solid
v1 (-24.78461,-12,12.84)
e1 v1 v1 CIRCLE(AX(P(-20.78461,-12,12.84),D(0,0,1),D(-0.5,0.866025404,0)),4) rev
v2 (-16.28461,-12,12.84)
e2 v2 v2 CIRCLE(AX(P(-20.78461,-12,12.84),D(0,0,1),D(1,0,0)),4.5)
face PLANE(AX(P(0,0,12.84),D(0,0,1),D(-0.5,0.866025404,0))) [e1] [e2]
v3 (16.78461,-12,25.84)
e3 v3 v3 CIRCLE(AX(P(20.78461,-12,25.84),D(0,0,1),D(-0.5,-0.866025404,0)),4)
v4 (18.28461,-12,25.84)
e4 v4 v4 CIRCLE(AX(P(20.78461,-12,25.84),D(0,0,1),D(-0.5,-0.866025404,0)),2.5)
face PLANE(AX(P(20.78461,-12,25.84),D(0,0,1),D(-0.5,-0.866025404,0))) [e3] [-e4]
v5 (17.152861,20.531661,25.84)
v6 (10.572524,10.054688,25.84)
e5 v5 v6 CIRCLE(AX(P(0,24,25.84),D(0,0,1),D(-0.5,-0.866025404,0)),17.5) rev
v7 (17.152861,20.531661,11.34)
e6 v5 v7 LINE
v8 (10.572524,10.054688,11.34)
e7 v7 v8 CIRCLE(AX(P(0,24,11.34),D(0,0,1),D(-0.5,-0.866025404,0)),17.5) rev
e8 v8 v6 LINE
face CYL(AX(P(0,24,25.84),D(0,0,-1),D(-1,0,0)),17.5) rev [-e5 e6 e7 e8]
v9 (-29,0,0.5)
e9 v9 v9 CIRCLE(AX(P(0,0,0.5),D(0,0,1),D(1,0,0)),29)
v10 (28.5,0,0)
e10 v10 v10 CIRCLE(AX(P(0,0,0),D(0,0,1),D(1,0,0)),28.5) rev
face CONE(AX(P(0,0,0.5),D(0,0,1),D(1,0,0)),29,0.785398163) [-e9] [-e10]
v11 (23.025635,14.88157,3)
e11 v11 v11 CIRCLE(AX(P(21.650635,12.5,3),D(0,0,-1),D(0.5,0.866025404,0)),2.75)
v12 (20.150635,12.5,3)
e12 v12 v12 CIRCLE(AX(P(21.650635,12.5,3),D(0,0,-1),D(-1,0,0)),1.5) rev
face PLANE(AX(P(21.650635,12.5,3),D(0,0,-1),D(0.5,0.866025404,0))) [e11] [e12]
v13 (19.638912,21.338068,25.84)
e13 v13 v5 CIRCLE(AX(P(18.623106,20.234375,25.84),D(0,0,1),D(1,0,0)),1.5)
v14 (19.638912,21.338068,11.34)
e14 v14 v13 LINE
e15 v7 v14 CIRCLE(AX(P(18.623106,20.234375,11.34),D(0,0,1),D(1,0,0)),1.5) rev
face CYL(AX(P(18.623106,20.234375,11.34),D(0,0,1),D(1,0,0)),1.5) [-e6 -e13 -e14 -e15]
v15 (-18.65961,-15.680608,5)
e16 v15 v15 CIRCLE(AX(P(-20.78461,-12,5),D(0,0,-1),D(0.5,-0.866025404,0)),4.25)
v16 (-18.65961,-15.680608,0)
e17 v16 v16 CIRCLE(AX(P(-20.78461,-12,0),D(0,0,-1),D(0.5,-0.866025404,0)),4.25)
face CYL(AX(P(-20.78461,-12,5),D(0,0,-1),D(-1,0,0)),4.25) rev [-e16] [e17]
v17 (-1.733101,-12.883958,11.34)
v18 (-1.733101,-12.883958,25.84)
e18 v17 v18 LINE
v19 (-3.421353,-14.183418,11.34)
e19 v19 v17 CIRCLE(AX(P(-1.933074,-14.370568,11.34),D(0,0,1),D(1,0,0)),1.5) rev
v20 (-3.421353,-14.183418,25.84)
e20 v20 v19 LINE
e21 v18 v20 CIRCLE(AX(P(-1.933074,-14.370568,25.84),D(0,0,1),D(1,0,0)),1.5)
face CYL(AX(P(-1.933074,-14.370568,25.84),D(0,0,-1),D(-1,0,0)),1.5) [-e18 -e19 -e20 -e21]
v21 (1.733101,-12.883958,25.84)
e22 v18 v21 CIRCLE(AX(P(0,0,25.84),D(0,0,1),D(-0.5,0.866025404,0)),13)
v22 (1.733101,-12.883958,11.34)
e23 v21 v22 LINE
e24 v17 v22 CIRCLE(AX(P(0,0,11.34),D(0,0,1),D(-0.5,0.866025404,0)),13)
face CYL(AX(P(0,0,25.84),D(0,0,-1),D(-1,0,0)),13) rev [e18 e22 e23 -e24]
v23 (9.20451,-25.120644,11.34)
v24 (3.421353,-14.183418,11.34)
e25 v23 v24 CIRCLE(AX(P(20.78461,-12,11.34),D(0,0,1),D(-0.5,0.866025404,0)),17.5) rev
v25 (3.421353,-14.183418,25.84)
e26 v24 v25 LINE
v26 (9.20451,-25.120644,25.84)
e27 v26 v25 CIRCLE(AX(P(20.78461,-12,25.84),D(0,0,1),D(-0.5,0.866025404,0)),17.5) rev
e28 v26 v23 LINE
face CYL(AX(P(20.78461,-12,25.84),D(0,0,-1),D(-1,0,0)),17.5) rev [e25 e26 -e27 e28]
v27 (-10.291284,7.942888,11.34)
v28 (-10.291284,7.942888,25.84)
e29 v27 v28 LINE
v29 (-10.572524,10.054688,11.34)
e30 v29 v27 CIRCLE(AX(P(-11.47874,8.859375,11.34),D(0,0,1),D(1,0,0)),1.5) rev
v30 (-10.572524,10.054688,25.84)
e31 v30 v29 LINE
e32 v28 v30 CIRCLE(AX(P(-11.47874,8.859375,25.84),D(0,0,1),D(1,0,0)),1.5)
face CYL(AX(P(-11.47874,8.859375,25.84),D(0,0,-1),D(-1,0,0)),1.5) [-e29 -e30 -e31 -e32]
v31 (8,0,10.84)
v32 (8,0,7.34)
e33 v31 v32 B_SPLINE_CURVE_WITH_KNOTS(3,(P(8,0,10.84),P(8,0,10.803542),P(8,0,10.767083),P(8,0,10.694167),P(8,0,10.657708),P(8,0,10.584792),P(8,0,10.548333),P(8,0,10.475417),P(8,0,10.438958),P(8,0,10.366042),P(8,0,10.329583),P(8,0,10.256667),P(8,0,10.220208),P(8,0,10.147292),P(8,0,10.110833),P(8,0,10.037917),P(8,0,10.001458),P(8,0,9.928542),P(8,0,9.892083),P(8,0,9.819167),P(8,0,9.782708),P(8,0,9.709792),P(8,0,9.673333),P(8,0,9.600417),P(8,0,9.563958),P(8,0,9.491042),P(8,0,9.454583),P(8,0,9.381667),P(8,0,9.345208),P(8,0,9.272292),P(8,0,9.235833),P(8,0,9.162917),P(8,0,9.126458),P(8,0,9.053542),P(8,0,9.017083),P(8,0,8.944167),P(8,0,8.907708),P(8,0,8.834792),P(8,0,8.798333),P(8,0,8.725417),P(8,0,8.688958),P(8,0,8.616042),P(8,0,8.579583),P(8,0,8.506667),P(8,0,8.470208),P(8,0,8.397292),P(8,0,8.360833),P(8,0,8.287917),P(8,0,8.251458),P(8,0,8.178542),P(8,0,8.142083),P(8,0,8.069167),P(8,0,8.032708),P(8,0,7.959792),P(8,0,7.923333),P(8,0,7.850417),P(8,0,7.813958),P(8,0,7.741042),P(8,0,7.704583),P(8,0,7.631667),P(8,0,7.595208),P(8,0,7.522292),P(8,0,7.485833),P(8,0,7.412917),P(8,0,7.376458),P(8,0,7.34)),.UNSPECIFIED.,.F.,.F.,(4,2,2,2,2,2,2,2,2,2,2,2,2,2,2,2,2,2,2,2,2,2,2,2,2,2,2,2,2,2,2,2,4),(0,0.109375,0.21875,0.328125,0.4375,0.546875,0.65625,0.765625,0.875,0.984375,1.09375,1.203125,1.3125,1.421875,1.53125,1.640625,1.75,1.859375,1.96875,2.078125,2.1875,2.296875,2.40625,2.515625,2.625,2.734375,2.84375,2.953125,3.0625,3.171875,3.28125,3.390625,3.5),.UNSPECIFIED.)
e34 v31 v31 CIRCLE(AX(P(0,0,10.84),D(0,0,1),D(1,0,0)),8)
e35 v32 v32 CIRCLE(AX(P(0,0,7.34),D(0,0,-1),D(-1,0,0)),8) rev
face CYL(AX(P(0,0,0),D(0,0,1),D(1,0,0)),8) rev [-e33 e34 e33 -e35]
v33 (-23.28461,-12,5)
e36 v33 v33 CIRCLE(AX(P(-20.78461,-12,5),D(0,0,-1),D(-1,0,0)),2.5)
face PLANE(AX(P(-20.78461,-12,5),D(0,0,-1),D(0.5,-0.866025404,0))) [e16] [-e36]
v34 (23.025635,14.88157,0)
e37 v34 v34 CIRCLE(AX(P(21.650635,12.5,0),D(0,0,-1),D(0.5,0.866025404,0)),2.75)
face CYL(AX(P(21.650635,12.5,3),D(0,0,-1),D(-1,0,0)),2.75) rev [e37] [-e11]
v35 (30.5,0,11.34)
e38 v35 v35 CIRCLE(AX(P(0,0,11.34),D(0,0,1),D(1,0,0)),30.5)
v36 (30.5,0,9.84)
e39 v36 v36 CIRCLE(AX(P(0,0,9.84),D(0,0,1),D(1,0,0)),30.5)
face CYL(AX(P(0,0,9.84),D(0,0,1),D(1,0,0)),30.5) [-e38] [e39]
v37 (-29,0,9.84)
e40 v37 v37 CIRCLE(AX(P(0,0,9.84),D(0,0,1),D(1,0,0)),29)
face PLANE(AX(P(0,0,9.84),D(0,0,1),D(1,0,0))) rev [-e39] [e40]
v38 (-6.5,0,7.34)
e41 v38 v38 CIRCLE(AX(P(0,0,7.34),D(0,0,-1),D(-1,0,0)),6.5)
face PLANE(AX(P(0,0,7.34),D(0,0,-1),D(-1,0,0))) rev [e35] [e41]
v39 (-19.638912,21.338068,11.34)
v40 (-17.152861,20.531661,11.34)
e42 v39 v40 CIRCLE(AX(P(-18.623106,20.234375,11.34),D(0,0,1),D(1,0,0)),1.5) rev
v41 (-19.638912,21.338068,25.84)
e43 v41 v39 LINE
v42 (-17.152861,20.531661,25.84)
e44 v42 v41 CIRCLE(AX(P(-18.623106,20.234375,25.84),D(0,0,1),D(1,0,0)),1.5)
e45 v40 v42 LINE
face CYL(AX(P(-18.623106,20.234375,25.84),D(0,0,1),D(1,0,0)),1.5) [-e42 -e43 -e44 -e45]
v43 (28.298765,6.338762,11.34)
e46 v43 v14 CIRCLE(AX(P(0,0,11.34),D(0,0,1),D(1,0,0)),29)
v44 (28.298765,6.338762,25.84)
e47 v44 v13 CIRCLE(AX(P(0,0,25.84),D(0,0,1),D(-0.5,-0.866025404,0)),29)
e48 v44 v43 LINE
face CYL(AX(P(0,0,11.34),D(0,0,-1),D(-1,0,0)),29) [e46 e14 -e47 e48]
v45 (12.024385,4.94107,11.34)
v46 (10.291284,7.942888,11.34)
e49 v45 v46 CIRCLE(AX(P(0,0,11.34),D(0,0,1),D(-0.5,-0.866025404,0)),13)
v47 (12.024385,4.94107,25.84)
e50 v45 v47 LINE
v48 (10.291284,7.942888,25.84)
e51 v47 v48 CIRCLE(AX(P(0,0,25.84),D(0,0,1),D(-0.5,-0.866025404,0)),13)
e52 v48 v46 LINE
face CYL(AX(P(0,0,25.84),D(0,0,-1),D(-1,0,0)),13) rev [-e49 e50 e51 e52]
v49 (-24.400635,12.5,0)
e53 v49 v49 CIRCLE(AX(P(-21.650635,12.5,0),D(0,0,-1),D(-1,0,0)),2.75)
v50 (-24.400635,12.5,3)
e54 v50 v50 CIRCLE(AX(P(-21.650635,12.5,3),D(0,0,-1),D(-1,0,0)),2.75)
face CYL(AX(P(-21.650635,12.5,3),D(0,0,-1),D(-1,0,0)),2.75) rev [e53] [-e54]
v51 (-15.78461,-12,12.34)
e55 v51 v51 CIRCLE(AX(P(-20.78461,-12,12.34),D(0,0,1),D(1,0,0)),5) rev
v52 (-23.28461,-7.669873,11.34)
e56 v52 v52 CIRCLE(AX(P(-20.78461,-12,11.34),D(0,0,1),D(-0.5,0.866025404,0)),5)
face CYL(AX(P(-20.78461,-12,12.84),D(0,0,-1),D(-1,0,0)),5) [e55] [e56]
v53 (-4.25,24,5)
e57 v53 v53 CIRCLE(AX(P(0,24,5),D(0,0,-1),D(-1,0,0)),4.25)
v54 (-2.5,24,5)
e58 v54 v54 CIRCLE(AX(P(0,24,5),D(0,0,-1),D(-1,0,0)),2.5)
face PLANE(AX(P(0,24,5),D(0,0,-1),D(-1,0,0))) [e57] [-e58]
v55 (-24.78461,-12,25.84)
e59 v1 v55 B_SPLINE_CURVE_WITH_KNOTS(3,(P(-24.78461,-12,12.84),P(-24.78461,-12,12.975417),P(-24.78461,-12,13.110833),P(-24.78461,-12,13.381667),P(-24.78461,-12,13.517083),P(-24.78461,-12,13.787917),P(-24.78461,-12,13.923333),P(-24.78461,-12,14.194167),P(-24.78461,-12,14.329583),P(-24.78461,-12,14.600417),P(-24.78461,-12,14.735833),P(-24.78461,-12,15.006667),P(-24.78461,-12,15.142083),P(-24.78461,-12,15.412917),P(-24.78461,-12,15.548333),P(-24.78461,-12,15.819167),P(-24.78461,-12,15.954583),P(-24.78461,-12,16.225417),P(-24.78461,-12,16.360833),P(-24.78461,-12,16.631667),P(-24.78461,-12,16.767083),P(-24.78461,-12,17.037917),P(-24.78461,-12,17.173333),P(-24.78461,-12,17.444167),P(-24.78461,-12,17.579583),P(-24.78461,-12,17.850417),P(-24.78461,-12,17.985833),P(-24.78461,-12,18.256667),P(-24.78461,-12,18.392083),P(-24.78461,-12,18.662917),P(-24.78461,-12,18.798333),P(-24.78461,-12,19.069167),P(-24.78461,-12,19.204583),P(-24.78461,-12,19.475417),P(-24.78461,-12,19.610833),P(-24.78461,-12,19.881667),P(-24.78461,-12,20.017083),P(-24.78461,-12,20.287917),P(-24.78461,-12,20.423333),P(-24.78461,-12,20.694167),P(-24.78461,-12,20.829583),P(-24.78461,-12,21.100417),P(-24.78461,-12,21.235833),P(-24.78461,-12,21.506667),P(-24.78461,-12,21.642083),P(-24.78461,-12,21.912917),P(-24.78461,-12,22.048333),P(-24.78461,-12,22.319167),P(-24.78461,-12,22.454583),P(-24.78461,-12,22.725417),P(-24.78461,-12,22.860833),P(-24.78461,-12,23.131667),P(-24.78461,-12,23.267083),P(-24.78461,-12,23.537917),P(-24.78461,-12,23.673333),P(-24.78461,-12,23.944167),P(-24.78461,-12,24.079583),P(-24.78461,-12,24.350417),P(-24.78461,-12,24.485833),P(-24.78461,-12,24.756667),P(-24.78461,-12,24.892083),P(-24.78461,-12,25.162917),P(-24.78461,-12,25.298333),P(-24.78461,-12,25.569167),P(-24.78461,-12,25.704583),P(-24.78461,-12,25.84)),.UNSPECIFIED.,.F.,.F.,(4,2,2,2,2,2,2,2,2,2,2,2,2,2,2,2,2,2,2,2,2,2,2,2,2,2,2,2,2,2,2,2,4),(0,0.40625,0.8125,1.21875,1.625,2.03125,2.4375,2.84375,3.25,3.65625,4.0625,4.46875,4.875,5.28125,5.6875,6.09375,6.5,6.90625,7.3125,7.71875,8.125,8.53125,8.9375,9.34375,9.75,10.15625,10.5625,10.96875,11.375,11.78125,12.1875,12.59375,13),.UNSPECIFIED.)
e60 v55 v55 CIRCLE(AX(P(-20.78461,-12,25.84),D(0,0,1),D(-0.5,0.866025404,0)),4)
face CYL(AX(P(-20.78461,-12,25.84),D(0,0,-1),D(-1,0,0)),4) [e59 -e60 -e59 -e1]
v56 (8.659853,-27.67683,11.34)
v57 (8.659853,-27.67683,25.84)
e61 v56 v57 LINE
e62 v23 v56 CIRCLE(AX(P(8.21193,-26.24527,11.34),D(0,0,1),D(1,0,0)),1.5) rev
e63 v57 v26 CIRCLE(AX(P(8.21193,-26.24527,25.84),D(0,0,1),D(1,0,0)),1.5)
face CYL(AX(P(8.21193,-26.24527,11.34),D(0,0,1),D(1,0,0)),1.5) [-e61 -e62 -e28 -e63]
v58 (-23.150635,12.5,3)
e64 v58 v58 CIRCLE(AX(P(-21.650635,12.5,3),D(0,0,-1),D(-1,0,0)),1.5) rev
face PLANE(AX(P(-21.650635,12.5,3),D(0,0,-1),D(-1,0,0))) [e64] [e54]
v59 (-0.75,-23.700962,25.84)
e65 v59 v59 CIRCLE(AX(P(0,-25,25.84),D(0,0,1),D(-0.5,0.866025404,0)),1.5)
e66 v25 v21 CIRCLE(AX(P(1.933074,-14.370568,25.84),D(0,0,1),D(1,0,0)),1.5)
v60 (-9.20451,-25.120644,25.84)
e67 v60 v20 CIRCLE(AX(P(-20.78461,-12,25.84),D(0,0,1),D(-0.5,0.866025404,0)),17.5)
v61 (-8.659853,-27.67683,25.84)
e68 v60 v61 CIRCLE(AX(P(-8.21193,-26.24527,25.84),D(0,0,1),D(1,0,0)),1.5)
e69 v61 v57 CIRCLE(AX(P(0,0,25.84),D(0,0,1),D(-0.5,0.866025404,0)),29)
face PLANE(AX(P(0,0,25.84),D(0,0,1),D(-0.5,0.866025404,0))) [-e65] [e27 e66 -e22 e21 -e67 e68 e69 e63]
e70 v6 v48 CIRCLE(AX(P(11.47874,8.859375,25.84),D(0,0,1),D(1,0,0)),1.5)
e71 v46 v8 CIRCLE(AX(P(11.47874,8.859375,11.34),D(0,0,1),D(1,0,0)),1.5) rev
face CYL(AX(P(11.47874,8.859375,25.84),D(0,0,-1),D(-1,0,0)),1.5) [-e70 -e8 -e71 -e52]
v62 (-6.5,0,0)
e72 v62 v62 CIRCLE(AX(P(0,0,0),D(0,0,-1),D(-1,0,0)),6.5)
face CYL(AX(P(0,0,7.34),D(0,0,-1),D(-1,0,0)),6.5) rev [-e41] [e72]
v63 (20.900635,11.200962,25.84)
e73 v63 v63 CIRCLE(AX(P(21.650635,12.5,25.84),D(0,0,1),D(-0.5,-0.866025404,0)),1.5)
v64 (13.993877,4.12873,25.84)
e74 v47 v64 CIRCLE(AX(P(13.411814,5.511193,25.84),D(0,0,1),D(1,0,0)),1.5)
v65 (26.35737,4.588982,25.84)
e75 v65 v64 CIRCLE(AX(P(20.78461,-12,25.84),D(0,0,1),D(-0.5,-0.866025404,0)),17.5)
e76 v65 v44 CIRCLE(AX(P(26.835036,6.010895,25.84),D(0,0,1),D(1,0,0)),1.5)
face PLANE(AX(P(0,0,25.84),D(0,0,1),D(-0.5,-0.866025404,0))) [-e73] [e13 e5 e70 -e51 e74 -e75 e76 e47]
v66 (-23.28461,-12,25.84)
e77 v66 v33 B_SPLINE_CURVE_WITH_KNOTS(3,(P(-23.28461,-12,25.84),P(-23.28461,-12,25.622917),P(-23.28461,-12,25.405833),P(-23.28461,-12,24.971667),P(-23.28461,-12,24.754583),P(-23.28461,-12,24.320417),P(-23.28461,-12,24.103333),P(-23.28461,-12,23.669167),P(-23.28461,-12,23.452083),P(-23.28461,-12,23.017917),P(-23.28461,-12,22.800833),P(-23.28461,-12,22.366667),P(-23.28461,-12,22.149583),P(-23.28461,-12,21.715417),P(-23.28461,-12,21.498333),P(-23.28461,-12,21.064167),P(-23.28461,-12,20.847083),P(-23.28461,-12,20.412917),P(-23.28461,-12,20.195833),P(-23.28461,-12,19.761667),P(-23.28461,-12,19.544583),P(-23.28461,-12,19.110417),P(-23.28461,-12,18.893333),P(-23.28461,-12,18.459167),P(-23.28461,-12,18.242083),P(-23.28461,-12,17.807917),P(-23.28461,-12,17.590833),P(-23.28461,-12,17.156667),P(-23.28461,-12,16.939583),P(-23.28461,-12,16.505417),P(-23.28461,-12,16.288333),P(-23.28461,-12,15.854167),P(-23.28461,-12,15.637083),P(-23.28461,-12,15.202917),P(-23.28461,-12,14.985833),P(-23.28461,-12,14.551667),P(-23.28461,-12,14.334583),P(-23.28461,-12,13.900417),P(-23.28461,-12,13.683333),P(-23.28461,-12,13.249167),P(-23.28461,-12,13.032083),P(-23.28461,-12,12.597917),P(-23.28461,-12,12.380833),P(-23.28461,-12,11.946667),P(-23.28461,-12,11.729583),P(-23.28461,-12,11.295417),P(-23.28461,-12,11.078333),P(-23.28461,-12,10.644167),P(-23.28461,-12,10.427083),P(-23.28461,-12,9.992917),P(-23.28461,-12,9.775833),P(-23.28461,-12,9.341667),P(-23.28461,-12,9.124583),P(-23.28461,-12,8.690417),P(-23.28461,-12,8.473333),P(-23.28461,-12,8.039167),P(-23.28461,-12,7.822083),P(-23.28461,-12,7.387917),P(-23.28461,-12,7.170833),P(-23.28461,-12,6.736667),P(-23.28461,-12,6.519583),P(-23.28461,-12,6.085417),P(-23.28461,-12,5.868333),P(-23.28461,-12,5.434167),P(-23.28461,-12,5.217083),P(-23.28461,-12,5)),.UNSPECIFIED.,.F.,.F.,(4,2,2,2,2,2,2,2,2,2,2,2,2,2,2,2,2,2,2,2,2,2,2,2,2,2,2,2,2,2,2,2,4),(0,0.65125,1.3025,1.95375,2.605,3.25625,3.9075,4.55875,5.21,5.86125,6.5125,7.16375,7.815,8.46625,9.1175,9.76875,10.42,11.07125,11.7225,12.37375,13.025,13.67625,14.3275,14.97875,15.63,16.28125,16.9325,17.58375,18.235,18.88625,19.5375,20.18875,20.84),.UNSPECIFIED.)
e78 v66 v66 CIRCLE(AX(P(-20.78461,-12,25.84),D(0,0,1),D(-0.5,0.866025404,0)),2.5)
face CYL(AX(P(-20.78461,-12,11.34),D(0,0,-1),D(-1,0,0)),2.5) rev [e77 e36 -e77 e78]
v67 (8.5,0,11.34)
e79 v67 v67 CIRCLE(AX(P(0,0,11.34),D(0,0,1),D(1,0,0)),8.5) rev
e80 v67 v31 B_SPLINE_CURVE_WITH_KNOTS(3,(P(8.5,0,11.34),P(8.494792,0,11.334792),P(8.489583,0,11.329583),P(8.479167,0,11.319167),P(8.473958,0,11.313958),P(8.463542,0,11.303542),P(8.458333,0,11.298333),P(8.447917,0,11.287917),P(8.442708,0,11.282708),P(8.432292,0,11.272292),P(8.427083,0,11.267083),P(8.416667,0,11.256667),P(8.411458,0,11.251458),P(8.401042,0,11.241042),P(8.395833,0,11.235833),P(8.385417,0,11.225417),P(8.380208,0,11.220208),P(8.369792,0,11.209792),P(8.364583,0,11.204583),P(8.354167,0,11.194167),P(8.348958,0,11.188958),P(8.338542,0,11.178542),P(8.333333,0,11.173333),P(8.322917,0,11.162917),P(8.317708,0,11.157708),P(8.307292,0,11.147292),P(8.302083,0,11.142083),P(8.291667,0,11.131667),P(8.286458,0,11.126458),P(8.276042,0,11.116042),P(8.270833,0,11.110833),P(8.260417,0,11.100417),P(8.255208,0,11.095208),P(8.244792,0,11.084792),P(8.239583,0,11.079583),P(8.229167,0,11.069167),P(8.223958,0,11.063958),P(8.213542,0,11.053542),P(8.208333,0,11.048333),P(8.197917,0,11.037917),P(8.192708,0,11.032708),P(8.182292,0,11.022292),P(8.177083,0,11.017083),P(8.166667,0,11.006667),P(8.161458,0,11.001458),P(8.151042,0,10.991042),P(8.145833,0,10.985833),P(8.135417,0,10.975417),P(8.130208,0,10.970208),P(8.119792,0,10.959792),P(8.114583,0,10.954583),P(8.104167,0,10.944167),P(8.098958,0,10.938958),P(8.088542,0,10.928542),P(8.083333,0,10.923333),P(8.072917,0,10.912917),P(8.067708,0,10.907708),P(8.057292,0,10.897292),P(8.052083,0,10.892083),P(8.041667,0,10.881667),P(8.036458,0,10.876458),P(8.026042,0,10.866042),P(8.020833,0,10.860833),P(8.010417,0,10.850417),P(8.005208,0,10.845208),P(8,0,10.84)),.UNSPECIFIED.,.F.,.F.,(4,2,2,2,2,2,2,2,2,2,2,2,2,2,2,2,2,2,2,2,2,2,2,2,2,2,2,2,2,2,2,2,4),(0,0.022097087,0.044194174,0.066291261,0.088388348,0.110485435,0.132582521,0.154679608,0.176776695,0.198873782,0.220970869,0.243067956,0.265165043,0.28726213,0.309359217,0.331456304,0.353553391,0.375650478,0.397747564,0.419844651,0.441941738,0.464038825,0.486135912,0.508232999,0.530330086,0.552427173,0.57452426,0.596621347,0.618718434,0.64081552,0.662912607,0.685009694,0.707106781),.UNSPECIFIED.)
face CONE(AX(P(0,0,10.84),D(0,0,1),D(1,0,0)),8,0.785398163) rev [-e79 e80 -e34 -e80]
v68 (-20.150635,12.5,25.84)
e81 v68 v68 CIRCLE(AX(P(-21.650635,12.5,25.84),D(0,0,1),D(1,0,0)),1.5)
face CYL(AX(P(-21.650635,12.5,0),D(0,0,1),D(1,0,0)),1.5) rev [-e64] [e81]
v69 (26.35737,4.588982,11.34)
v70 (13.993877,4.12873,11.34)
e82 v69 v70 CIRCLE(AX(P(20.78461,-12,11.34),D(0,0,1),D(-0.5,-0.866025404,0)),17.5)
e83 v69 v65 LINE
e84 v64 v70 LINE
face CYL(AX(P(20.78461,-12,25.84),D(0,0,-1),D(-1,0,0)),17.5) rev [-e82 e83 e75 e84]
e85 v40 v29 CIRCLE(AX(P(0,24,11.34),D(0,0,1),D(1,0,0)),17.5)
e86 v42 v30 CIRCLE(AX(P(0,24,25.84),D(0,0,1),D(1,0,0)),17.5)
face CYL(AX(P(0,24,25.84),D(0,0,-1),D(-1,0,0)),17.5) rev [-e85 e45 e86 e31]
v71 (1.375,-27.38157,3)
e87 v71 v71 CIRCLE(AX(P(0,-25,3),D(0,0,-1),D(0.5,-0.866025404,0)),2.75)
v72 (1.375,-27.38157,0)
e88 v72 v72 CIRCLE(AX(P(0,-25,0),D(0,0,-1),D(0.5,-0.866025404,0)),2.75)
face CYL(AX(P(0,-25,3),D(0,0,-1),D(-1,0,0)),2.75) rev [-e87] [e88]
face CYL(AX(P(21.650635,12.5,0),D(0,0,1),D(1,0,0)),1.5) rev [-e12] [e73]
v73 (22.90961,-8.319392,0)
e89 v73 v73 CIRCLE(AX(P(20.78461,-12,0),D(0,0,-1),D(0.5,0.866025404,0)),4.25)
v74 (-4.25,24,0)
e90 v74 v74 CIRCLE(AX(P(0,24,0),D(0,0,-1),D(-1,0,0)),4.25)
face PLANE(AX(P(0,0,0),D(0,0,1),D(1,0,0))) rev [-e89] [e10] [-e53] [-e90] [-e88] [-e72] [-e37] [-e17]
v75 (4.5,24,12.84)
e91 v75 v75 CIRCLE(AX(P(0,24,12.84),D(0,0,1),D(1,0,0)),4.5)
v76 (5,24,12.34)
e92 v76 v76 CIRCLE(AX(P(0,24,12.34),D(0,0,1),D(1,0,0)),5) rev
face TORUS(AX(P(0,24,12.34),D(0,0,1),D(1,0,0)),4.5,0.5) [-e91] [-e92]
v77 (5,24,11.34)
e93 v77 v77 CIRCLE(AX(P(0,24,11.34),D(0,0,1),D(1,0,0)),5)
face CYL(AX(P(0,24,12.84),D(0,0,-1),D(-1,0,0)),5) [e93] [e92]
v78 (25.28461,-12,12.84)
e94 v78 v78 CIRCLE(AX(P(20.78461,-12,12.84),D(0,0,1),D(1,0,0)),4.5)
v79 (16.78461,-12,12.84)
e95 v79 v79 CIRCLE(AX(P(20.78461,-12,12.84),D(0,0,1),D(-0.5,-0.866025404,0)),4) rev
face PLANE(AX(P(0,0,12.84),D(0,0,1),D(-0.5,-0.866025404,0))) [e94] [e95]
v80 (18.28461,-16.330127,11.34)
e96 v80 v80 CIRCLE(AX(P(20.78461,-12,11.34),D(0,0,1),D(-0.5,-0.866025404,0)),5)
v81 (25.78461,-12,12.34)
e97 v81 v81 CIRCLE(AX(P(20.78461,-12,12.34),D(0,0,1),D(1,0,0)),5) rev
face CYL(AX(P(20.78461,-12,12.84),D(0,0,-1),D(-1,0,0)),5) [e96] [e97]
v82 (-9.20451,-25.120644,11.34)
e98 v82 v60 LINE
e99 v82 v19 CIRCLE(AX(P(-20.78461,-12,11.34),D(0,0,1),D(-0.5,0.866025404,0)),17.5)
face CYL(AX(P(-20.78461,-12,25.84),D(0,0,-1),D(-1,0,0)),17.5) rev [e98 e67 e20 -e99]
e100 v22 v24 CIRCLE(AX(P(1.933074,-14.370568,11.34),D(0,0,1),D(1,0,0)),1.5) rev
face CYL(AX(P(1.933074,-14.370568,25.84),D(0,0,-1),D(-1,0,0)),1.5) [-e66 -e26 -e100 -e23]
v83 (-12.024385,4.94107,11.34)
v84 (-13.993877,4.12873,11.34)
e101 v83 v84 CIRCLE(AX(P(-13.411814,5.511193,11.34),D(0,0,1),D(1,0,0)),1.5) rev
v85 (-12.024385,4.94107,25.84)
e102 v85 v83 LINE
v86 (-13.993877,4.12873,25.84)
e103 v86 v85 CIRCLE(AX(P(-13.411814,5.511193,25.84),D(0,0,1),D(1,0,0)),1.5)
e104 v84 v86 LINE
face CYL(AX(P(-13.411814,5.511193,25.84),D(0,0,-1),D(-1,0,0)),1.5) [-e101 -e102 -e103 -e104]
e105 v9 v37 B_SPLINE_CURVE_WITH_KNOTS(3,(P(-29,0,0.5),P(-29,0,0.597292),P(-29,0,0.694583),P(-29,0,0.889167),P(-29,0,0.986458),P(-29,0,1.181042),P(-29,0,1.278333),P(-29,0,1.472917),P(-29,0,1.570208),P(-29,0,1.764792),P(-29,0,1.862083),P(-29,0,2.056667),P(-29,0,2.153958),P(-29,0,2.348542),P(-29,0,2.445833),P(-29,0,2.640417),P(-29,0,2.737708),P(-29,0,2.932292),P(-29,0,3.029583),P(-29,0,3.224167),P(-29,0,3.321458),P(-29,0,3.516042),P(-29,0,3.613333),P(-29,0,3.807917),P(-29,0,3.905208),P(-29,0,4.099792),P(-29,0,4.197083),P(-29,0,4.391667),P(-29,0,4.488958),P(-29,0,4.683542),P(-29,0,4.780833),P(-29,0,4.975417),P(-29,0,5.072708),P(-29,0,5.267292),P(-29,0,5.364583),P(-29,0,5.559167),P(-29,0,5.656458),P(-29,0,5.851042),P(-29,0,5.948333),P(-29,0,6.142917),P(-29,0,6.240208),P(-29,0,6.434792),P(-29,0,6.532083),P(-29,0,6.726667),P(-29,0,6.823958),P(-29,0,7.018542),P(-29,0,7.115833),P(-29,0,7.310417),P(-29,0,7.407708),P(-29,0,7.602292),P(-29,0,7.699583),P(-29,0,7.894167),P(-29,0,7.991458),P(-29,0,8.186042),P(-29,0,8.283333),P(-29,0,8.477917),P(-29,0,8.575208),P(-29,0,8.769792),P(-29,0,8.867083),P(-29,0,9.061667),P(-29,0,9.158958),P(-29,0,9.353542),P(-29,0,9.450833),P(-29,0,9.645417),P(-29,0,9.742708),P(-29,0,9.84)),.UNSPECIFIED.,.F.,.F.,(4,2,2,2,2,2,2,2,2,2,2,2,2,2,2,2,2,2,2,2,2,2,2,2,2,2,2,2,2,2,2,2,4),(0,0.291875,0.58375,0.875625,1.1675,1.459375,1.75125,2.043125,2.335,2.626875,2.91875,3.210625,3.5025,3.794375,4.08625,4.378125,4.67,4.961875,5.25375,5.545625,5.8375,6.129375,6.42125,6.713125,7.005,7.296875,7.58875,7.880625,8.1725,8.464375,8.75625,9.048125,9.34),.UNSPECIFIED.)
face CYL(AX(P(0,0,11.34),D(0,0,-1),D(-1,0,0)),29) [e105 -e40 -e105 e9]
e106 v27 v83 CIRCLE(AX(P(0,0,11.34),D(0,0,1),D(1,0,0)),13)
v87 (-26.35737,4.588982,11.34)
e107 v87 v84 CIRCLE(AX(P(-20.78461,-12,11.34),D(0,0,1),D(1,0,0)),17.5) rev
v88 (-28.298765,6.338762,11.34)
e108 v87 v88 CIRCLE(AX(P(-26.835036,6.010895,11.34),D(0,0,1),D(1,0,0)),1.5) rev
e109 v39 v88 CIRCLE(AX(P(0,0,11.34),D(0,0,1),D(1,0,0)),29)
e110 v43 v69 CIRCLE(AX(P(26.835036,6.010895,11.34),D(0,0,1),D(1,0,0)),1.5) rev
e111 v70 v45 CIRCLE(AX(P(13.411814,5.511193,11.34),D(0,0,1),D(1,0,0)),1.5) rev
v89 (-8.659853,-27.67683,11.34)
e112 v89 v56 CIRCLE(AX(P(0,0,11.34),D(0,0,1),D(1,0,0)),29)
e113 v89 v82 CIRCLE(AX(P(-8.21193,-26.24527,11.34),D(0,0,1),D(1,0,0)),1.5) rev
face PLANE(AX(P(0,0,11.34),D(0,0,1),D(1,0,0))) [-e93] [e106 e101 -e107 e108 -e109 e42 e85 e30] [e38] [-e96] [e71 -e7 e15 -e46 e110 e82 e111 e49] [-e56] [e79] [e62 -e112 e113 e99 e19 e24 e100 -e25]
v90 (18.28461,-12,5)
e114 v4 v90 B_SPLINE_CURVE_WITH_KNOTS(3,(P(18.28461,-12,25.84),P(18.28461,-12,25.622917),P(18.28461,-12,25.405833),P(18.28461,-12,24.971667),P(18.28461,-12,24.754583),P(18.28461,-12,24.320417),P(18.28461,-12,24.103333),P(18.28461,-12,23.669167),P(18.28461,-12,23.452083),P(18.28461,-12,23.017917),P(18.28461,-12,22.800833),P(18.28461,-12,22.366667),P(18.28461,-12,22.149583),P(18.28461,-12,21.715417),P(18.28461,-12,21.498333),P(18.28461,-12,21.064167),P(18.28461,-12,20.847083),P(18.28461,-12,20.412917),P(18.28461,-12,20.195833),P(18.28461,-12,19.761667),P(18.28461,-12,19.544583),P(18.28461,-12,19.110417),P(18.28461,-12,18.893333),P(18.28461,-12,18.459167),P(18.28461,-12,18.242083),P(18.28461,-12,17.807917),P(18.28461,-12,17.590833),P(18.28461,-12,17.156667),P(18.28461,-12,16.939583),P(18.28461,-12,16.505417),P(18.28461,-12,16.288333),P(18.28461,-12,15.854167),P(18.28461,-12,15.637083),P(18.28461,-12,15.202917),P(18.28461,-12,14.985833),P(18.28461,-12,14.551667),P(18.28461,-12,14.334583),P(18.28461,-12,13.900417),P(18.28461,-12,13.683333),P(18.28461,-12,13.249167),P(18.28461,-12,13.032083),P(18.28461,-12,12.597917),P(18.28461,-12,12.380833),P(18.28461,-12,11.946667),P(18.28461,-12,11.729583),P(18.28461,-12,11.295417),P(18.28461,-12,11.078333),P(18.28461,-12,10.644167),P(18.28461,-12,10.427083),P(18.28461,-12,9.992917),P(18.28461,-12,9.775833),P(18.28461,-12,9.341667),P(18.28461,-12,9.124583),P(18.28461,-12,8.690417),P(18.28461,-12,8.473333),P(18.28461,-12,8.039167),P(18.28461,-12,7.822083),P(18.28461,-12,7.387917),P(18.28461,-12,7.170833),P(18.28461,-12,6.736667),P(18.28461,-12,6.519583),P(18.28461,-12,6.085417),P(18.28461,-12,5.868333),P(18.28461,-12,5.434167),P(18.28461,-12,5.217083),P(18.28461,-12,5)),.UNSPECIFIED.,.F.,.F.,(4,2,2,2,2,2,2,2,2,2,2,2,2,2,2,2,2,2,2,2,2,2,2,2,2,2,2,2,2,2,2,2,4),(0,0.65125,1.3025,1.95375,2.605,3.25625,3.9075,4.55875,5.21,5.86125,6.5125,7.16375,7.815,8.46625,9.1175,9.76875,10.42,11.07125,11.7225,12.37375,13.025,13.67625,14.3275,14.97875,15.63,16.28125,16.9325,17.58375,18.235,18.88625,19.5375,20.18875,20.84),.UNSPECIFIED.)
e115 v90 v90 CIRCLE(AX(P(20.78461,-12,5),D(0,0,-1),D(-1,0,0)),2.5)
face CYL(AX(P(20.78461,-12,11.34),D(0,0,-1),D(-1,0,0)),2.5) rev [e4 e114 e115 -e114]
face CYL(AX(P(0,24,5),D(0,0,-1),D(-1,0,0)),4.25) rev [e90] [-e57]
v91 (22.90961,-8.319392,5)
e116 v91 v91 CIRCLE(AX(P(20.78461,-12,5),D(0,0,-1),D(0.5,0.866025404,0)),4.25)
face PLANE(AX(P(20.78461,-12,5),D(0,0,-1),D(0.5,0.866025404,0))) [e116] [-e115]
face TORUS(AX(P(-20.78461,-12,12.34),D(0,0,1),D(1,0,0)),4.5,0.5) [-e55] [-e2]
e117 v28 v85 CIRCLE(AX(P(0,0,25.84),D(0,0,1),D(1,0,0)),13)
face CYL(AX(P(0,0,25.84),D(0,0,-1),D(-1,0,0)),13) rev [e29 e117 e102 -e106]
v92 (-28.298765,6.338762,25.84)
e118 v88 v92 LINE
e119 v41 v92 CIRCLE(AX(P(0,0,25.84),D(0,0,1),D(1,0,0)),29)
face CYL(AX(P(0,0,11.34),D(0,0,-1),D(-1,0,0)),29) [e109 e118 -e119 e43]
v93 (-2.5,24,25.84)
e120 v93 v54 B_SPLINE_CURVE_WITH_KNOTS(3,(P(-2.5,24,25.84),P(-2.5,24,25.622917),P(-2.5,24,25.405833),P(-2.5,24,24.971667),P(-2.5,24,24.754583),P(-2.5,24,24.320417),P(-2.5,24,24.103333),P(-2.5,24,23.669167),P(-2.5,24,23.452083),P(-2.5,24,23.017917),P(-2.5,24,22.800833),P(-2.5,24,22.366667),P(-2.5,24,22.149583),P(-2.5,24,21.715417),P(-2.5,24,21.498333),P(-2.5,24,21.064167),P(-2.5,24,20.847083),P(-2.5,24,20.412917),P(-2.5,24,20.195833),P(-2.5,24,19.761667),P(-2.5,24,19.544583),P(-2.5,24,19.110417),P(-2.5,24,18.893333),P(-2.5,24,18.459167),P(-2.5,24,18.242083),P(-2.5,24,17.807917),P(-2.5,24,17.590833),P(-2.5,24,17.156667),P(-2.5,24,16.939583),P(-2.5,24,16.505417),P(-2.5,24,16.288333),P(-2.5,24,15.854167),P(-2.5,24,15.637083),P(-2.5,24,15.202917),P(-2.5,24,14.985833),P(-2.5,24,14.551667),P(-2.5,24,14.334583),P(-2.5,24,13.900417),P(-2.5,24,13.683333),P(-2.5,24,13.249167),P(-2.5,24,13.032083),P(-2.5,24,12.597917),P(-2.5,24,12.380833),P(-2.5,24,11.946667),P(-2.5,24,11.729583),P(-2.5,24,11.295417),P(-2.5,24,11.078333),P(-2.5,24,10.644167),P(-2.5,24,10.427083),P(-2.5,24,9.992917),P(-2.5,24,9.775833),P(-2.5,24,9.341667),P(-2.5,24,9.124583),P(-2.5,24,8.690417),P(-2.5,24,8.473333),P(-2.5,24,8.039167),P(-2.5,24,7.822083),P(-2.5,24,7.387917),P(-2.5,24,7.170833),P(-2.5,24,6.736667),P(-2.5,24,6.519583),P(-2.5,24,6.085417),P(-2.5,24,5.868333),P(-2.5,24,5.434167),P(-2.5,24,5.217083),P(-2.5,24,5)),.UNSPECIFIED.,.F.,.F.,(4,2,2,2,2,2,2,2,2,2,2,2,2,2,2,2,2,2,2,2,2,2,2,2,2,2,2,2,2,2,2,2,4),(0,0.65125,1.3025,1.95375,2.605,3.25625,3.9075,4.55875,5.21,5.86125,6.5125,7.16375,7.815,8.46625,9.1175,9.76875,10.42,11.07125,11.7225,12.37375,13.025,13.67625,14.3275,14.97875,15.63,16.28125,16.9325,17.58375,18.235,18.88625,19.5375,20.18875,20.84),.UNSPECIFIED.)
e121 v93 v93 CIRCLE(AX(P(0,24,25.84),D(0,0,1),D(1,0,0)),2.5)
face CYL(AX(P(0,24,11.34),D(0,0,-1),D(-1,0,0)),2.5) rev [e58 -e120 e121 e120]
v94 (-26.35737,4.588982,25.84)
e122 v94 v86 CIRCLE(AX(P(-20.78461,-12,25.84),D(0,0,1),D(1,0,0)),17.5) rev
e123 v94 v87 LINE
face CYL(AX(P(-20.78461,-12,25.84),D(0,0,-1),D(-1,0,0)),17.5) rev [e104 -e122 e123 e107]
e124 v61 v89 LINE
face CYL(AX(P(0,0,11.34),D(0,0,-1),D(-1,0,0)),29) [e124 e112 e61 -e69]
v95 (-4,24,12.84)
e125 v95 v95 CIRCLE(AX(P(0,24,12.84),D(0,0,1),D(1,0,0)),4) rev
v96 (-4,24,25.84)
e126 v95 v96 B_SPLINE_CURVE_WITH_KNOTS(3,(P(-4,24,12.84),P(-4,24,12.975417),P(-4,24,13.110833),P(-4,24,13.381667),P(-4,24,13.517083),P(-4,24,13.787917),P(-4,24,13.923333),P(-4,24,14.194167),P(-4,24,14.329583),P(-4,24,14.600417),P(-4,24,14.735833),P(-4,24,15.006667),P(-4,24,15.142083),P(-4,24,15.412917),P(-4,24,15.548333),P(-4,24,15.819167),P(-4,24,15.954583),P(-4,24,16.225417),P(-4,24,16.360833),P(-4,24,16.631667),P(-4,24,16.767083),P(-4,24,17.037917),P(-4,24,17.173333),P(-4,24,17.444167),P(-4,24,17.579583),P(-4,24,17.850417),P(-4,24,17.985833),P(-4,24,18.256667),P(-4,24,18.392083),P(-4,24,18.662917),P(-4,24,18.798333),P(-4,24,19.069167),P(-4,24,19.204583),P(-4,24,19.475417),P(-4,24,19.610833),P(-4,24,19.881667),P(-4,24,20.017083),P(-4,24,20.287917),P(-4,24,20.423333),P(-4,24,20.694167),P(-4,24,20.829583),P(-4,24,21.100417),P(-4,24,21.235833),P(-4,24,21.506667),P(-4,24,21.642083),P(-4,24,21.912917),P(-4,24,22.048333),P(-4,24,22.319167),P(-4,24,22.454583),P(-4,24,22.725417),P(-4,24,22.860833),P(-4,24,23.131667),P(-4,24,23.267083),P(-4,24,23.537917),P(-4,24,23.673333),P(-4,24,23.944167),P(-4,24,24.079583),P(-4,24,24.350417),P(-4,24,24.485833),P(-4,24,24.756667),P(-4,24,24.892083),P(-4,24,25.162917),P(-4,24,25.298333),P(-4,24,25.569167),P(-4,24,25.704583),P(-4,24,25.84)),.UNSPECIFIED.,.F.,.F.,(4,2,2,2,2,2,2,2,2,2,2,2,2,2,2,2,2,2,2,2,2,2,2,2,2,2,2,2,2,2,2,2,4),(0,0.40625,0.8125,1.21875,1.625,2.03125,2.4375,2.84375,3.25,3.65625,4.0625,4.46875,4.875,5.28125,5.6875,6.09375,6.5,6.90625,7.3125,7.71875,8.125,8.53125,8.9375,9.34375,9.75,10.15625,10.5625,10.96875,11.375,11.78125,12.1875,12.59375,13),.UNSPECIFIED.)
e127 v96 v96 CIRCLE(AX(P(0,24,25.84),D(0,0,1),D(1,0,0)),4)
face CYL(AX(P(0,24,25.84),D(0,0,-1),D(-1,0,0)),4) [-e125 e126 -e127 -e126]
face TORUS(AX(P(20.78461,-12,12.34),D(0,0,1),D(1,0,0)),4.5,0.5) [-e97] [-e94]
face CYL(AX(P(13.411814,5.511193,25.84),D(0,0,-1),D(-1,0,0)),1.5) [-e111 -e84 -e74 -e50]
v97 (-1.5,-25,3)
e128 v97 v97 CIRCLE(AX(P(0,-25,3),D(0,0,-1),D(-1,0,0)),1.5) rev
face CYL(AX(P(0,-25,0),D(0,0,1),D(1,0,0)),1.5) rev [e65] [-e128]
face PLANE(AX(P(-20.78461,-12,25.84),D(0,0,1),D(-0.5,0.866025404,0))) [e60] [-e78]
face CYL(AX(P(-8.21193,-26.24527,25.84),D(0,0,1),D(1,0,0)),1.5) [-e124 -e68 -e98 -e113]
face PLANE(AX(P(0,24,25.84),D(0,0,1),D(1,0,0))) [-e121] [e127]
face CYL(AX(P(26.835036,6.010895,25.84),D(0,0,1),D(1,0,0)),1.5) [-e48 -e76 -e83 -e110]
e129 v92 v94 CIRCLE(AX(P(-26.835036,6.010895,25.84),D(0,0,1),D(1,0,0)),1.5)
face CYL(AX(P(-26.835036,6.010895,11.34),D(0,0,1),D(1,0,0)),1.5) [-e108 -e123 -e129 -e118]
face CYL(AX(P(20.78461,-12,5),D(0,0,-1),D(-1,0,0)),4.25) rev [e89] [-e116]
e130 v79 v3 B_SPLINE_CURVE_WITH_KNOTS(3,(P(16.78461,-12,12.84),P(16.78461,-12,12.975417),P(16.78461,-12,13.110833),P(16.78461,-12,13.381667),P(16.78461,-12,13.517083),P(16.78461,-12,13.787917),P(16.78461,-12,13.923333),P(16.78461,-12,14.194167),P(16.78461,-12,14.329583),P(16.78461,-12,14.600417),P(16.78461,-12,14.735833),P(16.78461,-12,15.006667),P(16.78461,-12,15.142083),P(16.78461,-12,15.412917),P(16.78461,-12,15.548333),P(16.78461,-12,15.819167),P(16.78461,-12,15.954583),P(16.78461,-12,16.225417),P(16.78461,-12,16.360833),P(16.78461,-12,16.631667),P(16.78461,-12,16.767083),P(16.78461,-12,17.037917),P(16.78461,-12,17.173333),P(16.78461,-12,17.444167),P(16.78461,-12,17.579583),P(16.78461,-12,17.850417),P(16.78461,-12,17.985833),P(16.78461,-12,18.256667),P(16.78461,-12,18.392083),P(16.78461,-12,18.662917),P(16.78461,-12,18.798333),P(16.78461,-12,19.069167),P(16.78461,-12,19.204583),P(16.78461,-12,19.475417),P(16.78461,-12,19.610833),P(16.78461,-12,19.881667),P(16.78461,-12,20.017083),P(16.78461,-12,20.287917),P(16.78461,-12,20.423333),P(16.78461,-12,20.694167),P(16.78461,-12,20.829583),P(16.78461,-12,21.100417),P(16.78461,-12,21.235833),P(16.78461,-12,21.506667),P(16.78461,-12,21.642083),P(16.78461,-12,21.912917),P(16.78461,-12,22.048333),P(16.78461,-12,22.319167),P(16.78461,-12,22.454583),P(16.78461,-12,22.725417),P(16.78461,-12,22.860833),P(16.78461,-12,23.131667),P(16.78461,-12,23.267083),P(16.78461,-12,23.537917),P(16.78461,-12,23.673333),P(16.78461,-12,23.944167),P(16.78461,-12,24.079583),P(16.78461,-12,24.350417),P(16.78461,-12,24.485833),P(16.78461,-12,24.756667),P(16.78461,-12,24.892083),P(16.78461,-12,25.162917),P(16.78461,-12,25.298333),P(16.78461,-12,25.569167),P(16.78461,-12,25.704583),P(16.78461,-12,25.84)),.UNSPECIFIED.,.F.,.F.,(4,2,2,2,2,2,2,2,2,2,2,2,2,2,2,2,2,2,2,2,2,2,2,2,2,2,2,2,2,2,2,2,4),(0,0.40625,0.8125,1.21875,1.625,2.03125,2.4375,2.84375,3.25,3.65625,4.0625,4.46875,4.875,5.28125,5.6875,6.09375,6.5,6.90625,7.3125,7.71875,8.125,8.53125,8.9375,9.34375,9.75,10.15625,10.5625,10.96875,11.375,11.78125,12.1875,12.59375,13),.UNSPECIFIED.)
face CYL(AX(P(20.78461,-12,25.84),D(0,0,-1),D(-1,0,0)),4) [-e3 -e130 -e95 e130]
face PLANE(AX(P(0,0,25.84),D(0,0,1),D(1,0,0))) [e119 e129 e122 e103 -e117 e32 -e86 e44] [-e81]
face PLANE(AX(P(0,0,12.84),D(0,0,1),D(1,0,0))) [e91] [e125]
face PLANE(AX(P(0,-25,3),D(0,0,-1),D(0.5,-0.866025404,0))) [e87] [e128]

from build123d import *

# Parameters (mm, degrees)
SKETCH1_R                = 29
SKETCH1_R_2              = 2.5
BOSS_EXTRUDE1_DEPTH      = 11.34
SKETCH2_R                = 4
SKETCH2_R_2              = 2.5
BOSS_EXTRUDE2_DEPTH      = 14.5
SKETCH3_R                = 5
SKETCH3_R_2              = 4
BOSS_EXTRUDE3_DEPTH      = 1.5
BOSS_EXTRUDE4_DEPTH      = 14.5
FILLET2_R                = 0.5
FILLET5_R                = 1.5
CIRPATTERN1_COUNT        = 3
FILLET2_OF_CIRPATTERN1_R = 0.5
FILLET5_OF_CIRPATTERN1_R = 1.5
SKETCH5_R                = 1.5
CUT_EXTRUDE1_DEPTH       = 49.473761975
SKETCH6_R                = 2.75
CUT_EXTRUDE2_DEPTH       = 3
SKETCH7_R                = 4.25
CUT_EXTRUDE3_DEPTH       = 5
CIRPATTERN2_COUNT        = 3
CHAMFER1_SIZE            = 0.5
SKETCH9_R                = 8
CUT_EXTRUDE4_DEPTH       = 44.5
BOSS_EXTRUDE7_START      = -7.34
SKETCH10_R               = 8
SKETCH10_R_2             = 6.5
BOSS_EXTRUDE7_DEPTH      = 7.34
CHAMFER2_SIZE            = 0.5
BOSS_EXTRUDE8_START      = -1.5
SKETCH11_R               = 30.5
SKETCH11_R_2             = 29
BOSS_EXTRUDE8_DEPTH      = 1.5


with BuildPart() as part:
    # Sketch1 → Boss-Extrude1 (new body)
    with BuildSketch(Plane.XY):
        with Locations(Location((0, 0, 0), (0, 0, 180))):
            Circle(SKETCH1_R)
        with Locations(Location((0, 24, 0), (0, 0, 180))):
            Circle(SKETCH1_R_2, mode=Mode.SUBTRACT)
        with Locations(Location((20.784609691, -12, 0), (0, 0, 180))):
            Circle(SKETCH1_R_2, mode=Mode.SUBTRACT)
        with Locations(Location((-20.784609691, -12, 0), (0, 0, 180))):
            Circle(SKETCH1_R_2, mode=Mode.SUBTRACT)
    extrude(amount=BOSS_EXTRUDE1_DEPTH)

    # Sketch2 → Boss-Extrude2 (add)
    with BuildSketch(Plane.XY.offset(11.34)):
        with Locations(Location((0, 24, 0), (0, 0, 180))):
            Circle(SKETCH2_R)
        with Locations(Location((0, 24, 0), (0, 0, 180))):
            Circle(SKETCH2_R_2, mode=Mode.SUBTRACT)
    boss_extrude2 = extrude(amount=BOSS_EXTRUDE2_DEPTH)

    # Sketch3 → Boss-Extrude3 (add)
    with BuildSketch(Plane.XY.offset(11.34)):
        with Locations(Location((0, 24, 0), (0, 0, 90))):
            Circle(SKETCH3_R)
        with Locations(Location((0, 24, 0), (0, 0, 180))):
            Circle(SKETCH3_R_2, mode=Mode.SUBTRACT)
    boss_extrude3 = extrude(amount=BOSS_EXTRUDE3_DEPTH)

    # Sketch4 → Boss-Extrude4 (add)
    with BuildSketch(Plane.XY.offset(11.34)):
        with BuildLine():
            ThreePointArc((-9.243861456, 9.140625), (-15.08397544, 15.127363136), (-17.478886538, 23.140625))
            ThreePointArc((-17.478886538, 23.140625), (-25.11473671, 14.5), (-28.779812378, 3.566847272))
            ThreePointArc((-28.779812378, 3.566847272), (-20.642668488, 5.499424353), (-12.537944184, 3.43510635))
            ThreePointArc((-12.537944184, 3.43510635), (-11.258330249, 6.5), (-9.243861456, 9.140625))
        make_face()
    boss_extrude4 = extrude(amount=BOSS_EXTRUDE4_DEPTH)

    # Fillet2
    fillet2_edges = [part.edges().sort_by_distance(p)[0] for p in [
        (0, 19, 12.84),
    ]]
    fillet(fillet2_edges, radius=FILLET2_R)

    # Fillet5
    # the kernel refuses this fillet: 1.5 mm, written as the material it takes off along each edge
    with BuildSketch(Plane(origin=(-17.478886538, 23.140625, 11.34), x_dir=(0.12399934101480344, -0.9922823002693812, 0), z_dir=(0, 0, 1))) as fillet5_piece_1:
        with BuildLine():
            CenterArc((2.741938005, -1.495761572), FILLET5_R, 94.30820856, 121.194344996)
            ThreePointArc((1.52080355, -2.36687043), (0.731683032, -1.201888091), (0, 0))
            ThreePointArc((0, 0), (1.314627811, -0.049448326), (2.629255621, 0))
        make_face()
    extrude(amount=21.53336649, mode=Mode.SUBTRACT)
    with BuildSketch(Plane(origin=(-28.779812378, 3.566847272, 11.34), x_dir=(0.9213413502663426, 0.3887545707633453, 0), z_dir=(0, 0, 1))) as fillet5_piece_2:
        with BuildLine():
            CenterArc((2.741938005, 1.495761572), FILLET5_R, 144.497446444, 121.194344996)
            ThreePointArc((1.52080355, 2.36687043), (0.731683032, 1.201888091), (0, 0))
            ThreePointArc((0, 0), (1.314627811, 0.049448326), (2.629255621, 0))
        make_face()
    extrude(amount=21.53336649, mode=Mode.SUBTRACT)
    with BuildSketch(Plane(origin=(-12.537944184, 3.43510635, 11.34), x_dir=(-0.9027827871570022, 0.430096778891722, 0), z_dir=(0, 0, 1))) as fillet5_piece_3:
        with BuildLine():
            CenterArc((1.681832709, -1.498406794), FILLET5_R, 92.640987591, 90.493935252)
            ThreePointArc((0.184077424, -1.580437939), (0.116240905, -0.787400081), (0, 0))
            ThreePointArc((0, 0), (0.806358148, -0.018587399), (1.612716296, 0))
        make_face()
    extrude(amount=18.53179074, mode=Mode.SUBTRACT)
    with BuildSketch(Plane(origin=(-9.243861456, 9.140625, 11.34), x_dir=(-0.6582920213979585, -0.7527626548679136, 0), z_dir=(0, 0, 1))) as fillet5_piece_4:
        with BuildLine():
            CenterArc((1.682917286, -1.497188561), FILLET5_R, 93.508521646, 90.493935252)
            ThreePointArc((0.186575699, -1.601887437), (0.11175044, -0.798793336), (0, 0))
            ThreePointArc((0, 0), (0.795560899, -0.024365801), (1.591121798, 0))
        make_face()
    extrude(amount=18.53179074, mode=Mode.SUBTRACT)

    # CirPattern1: Boss-Extrude2, Boss-Extrude3, Boss-Extrude4 ×3 about axis
    cirpattern1_axis = Axis((0, 0, 0), (0, 0, 1))
    add([boss_extrude2.rotate(cirpattern1_axis, i * 360 / CIRPATTERN1_COUNT) for i in range(1, CIRPATTERN1_COUNT)])
    add([boss_extrude3.rotate(cirpattern1_axis, i * 360 / CIRPATTERN1_COUNT) for i in range(1, CIRPATTERN1_COUNT)])
    add([boss_extrude4.rotate(cirpattern1_axis, i * 360 / CIRPATTERN1_COUNT) for i in range(1, CIRPATTERN1_COUNT)])

    # Fillet2 of CirPattern1
    fillet2_of_cirpattern1_edges = [part.edges().sort_by_distance(p)[0] for p in [
        (-16.454482672, -9.5, 12.84),
        (16.454482672, -9.5, 12.84),
    ]]
    fillet(fillet2_of_cirpattern1_edges, radius=FILLET2_OF_CIRPATTERN1_R)

    # Fillet5 of CirPattern1
    # the kernel refuses this fillet: 1.5 mm, written as the material it takes off along each edge
    with BuildSketch(Plane(origin=(-11.30092584, -26.707472272, 11.34), x_dir=(0.9387654185354608, -0.3445569458913013, 0), z_dir=(0, 0, 1))) as fillet5_of_cirpattern1_piece_1:
        with BuildLine():
            CenterArc((2.740587632, 1.498234339), FILLET5_OF_CIRPATTERN1_R, 151.58593368, 121.194344996)
            ThreePointArc((1.421289964, 2.211994566), (0.752245893, 1.079267128), (0, 0))
            ThreePointArc((0, 0), (1.406673298, -0.034136121), (2.813346596, 0))
        make_face()
    extrude(amount=21.53336649, mode=Mode.SUBTRACT)
    with BuildSketch(Plane(origin=(11.30092584, -26.707472272, 11.34), x_dir=(-0.9387654185354388, -0.3445569458913611, 0), z_dir=(0, 0, 1))) as fillet5_of_cirpattern1_piece_2:
        with BuildLine():
            CenterArc((2.740587632, -1.498234339), FILLET5_OF_CIRPATTERN1_R, 87.219721325, 121.194344996)
            ThreePointArc((1.421289964, -2.211994566), (0.752245893, -1.079267128), (0, 0))
            ThreePointArc((0, 0), (1.406673298, 0.034136121), (2.813346596, 0))
        make_face()
    extrude(amount=21.53336649, mode=Mode.SUBTRACT)
    with BuildSketch(Plane(origin=(3.294082729, -12.57573135, 11.34), x_dir=(0.07891665697240977, -0.9968812172231449, 0), z_dir=(0, 0, 1)), Plane(origin=(9.243861456, 9.140625, 11.34), x_dir=(0.823866130184591, 0.5667844383314229, 0), z_dir=(0, 0, 1))) as fillet5_of_cirpattern1_piece_3:
        with BuildLine():
            CenterArc((1.681832709, -1.498406794), FILLET5_OF_CIRPATTERN1_R, 92.640987591, 90.493935252)
            ThreePointArc((0.184077424, -1.580437939), (0.116240905, -0.787400081), (0, 0))
            ThreePointArc((0, 0), (0.806358148, -0.018587399), (1.612716296, 0))
        make_face()
    extrude(amount=18.53179074, mode=Mode.SUBTRACT)
    with BuildSketch(Plane(origin=(-3.294082729, -12.57573135, 11.34), x_dir=(0.9810575928348104, -0.19371628620528378, 0), z_dir=(0, 0, 1)), Plane(origin=(12.537944184, 3.43510635, 11.34), x_dir=(-0.3227655714368486, 0.9464789410731993, 0), z_dir=(0, 0, 1))) as fillet5_of_cirpattern1_piece_4:
        with BuildLine():
            CenterArc((1.682917286, -1.497188561), FILLET5_OF_CIRPATTERN1_R, 93.508521646, 90.493935252)
            ThreePointArc((0.186575699, -1.601887437), (0.11175044, -0.798793336), (0, 0))
            ThreePointArc((0, 0), (0.795560899, -0.024365801), (1.591121798, 0))
        make_face()
    extrude(amount=18.53179074, mode=Mode.SUBTRACT)
    with BuildSketch(Plane(origin=(28.779812378, 3.566847272, 11.34), x_dir=(-0.9213413502663421, 0.38875457076334596, 0), z_dir=(0, 0, 1))) as fillet5_of_cirpattern1_piece_5:
        with BuildLine():
            CenterArc((2.741938005, -1.495761572), FILLET5_OF_CIRPATTERN1_R, 94.30820856, 121.194344996)
            ThreePointArc((1.52080355, -2.36687043), (0.731683032, -1.201888091), (0, 0))
            ThreePointArc((0, 0), (1.314627811, -0.049448326), (2.629255621, 0))
        make_face()
    extrude(amount=21.53336649, mode=Mode.SUBTRACT)
    with BuildSketch(Plane(origin=(17.478886538, 23.140625, 11.34), x_dir=(-0.12399934101479214, -0.9922823002693827, 0), z_dir=(0, 0, 1))) as fillet5_of_cirpattern1_piece_6:
        with BuildLine():
            CenterArc((2.741938005, 1.495761572), FILLET5_OF_CIRPATTERN1_R, 144.497446444, 121.194344996)
            ThreePointArc((1.52080355, 2.36687043), (0.731683032, 1.201888091), (0, 0))
            ThreePointArc((0, 0), (1.314627811, 0.049448326), (2.629255621, 0))
        make_face()
    extrude(amount=21.53336649, mode=Mode.SUBTRACT)

    # Sketch5 → Cut-Extrude1 (cut, through all)
    with BuildSketch(Plane.XY.offset(25.84)):
        with Locations((-21.650635095, 12.5)):
            Circle(SKETCH5_R)
    cut_extrude1 = extrude(amount=-CUT_EXTRUDE1_DEPTH, mode=Mode.SUBTRACT)

    # Sketch6 → Cut-Extrude2 (cut)
    with BuildSketch(Plane(origin=(0, 0, 0), x_dir=(-1, 0, 0), z_dir=(0, 0, -1))):
        with Locations((21.650635095, 12.5)):
            Circle(SKETCH6_R)
    cut_extrude2 = extrude(amount=-CUT_EXTRUDE2_DEPTH, mode=Mode.SUBTRACT)

    # Sketch7 → Cut-Extrude3 (cut)
    with BuildSketch(Plane(origin=(0, 0, 0), x_dir=(-1, 0, 0), z_dir=(0, 0, -1))):
        with Locations((0, 24)):
            Circle(SKETCH7_R)
    cut_extrude3 = extrude(amount=-CUT_EXTRUDE3_DEPTH, mode=Mode.SUBTRACT)

    # CirPattern2: Cut-Extrude1, Cut-Extrude2, Cut-Extrude3 ×3 about axis
    cirpattern2_axis = Axis((0, 0, 0), (0, 0, 1))
    add([cut_extrude1.rotate(cirpattern2_axis, i * 360 / CIRPATTERN2_COUNT) for i in range(1, CIRPATTERN2_COUNT)], mode=Mode.SUBTRACT)
    add([cut_extrude2.rotate(cirpattern2_axis, i * 360 / CIRPATTERN2_COUNT) for i in range(1, CIRPATTERN2_COUNT)], mode=Mode.SUBTRACT)
    add([cut_extrude3.rotate(cirpattern2_axis, i * 360 / CIRPATTERN2_COUNT) for i in range(1, CIRPATTERN2_COUNT)], mode=Mode.SUBTRACT)

    # Chamfer1
    chamfer1_edges = [part.edges().sort_by_distance(p)[0] for p in [
        (29, 0, 0),
    ]]
    chamfer(chamfer1_edges, length=CHAMFER1_SIZE)

    # Sketch9 → Cut-Extrude4 (cut, through all)
    with BuildSketch(Plane.XY.offset(11.34)):
        Circle(SKETCH9_R)
    extrude(amount=-CUT_EXTRUDE4_DEPTH, mode=Mode.SUBTRACT)

    # Sketch10 → Boss-Extrude7 (add)
    with BuildSketch(Plane(origin=(0, 0, 0), x_dir=(-1, 0, 0), z_dir=(0, 0, -1)).offset(BOSS_EXTRUDE7_START)):
        with Locations(Location((0, 0, 0), (0, 0, 180))):
            Circle(SKETCH10_R)
        Circle(SKETCH10_R_2, mode=Mode.SUBTRACT)
    extrude(amount=BOSS_EXTRUDE7_DEPTH)

    # Chamfer2
    chamfer2_edges = [part.edges().sort_by_distance(p)[0] for p in [
        (-8, 0, 11.34),
    ]]
    chamfer(chamfer2_edges, length=CHAMFER2_SIZE)

    # Sketch11 → Boss-Extrude8 (add)
    with BuildSketch(Plane.XY.offset(11.34).offset(BOSS_EXTRUDE8_START)):
        Circle(SKETCH11_R)
        with Locations(Location((0, 0, 0), (0, 0, 180))):
            Circle(SKETCH11_R_2, mode=Mode.SUBTRACT)
    extrude(amount=BOSS_EXTRUDE8_DEPTH)


solid = part.part
